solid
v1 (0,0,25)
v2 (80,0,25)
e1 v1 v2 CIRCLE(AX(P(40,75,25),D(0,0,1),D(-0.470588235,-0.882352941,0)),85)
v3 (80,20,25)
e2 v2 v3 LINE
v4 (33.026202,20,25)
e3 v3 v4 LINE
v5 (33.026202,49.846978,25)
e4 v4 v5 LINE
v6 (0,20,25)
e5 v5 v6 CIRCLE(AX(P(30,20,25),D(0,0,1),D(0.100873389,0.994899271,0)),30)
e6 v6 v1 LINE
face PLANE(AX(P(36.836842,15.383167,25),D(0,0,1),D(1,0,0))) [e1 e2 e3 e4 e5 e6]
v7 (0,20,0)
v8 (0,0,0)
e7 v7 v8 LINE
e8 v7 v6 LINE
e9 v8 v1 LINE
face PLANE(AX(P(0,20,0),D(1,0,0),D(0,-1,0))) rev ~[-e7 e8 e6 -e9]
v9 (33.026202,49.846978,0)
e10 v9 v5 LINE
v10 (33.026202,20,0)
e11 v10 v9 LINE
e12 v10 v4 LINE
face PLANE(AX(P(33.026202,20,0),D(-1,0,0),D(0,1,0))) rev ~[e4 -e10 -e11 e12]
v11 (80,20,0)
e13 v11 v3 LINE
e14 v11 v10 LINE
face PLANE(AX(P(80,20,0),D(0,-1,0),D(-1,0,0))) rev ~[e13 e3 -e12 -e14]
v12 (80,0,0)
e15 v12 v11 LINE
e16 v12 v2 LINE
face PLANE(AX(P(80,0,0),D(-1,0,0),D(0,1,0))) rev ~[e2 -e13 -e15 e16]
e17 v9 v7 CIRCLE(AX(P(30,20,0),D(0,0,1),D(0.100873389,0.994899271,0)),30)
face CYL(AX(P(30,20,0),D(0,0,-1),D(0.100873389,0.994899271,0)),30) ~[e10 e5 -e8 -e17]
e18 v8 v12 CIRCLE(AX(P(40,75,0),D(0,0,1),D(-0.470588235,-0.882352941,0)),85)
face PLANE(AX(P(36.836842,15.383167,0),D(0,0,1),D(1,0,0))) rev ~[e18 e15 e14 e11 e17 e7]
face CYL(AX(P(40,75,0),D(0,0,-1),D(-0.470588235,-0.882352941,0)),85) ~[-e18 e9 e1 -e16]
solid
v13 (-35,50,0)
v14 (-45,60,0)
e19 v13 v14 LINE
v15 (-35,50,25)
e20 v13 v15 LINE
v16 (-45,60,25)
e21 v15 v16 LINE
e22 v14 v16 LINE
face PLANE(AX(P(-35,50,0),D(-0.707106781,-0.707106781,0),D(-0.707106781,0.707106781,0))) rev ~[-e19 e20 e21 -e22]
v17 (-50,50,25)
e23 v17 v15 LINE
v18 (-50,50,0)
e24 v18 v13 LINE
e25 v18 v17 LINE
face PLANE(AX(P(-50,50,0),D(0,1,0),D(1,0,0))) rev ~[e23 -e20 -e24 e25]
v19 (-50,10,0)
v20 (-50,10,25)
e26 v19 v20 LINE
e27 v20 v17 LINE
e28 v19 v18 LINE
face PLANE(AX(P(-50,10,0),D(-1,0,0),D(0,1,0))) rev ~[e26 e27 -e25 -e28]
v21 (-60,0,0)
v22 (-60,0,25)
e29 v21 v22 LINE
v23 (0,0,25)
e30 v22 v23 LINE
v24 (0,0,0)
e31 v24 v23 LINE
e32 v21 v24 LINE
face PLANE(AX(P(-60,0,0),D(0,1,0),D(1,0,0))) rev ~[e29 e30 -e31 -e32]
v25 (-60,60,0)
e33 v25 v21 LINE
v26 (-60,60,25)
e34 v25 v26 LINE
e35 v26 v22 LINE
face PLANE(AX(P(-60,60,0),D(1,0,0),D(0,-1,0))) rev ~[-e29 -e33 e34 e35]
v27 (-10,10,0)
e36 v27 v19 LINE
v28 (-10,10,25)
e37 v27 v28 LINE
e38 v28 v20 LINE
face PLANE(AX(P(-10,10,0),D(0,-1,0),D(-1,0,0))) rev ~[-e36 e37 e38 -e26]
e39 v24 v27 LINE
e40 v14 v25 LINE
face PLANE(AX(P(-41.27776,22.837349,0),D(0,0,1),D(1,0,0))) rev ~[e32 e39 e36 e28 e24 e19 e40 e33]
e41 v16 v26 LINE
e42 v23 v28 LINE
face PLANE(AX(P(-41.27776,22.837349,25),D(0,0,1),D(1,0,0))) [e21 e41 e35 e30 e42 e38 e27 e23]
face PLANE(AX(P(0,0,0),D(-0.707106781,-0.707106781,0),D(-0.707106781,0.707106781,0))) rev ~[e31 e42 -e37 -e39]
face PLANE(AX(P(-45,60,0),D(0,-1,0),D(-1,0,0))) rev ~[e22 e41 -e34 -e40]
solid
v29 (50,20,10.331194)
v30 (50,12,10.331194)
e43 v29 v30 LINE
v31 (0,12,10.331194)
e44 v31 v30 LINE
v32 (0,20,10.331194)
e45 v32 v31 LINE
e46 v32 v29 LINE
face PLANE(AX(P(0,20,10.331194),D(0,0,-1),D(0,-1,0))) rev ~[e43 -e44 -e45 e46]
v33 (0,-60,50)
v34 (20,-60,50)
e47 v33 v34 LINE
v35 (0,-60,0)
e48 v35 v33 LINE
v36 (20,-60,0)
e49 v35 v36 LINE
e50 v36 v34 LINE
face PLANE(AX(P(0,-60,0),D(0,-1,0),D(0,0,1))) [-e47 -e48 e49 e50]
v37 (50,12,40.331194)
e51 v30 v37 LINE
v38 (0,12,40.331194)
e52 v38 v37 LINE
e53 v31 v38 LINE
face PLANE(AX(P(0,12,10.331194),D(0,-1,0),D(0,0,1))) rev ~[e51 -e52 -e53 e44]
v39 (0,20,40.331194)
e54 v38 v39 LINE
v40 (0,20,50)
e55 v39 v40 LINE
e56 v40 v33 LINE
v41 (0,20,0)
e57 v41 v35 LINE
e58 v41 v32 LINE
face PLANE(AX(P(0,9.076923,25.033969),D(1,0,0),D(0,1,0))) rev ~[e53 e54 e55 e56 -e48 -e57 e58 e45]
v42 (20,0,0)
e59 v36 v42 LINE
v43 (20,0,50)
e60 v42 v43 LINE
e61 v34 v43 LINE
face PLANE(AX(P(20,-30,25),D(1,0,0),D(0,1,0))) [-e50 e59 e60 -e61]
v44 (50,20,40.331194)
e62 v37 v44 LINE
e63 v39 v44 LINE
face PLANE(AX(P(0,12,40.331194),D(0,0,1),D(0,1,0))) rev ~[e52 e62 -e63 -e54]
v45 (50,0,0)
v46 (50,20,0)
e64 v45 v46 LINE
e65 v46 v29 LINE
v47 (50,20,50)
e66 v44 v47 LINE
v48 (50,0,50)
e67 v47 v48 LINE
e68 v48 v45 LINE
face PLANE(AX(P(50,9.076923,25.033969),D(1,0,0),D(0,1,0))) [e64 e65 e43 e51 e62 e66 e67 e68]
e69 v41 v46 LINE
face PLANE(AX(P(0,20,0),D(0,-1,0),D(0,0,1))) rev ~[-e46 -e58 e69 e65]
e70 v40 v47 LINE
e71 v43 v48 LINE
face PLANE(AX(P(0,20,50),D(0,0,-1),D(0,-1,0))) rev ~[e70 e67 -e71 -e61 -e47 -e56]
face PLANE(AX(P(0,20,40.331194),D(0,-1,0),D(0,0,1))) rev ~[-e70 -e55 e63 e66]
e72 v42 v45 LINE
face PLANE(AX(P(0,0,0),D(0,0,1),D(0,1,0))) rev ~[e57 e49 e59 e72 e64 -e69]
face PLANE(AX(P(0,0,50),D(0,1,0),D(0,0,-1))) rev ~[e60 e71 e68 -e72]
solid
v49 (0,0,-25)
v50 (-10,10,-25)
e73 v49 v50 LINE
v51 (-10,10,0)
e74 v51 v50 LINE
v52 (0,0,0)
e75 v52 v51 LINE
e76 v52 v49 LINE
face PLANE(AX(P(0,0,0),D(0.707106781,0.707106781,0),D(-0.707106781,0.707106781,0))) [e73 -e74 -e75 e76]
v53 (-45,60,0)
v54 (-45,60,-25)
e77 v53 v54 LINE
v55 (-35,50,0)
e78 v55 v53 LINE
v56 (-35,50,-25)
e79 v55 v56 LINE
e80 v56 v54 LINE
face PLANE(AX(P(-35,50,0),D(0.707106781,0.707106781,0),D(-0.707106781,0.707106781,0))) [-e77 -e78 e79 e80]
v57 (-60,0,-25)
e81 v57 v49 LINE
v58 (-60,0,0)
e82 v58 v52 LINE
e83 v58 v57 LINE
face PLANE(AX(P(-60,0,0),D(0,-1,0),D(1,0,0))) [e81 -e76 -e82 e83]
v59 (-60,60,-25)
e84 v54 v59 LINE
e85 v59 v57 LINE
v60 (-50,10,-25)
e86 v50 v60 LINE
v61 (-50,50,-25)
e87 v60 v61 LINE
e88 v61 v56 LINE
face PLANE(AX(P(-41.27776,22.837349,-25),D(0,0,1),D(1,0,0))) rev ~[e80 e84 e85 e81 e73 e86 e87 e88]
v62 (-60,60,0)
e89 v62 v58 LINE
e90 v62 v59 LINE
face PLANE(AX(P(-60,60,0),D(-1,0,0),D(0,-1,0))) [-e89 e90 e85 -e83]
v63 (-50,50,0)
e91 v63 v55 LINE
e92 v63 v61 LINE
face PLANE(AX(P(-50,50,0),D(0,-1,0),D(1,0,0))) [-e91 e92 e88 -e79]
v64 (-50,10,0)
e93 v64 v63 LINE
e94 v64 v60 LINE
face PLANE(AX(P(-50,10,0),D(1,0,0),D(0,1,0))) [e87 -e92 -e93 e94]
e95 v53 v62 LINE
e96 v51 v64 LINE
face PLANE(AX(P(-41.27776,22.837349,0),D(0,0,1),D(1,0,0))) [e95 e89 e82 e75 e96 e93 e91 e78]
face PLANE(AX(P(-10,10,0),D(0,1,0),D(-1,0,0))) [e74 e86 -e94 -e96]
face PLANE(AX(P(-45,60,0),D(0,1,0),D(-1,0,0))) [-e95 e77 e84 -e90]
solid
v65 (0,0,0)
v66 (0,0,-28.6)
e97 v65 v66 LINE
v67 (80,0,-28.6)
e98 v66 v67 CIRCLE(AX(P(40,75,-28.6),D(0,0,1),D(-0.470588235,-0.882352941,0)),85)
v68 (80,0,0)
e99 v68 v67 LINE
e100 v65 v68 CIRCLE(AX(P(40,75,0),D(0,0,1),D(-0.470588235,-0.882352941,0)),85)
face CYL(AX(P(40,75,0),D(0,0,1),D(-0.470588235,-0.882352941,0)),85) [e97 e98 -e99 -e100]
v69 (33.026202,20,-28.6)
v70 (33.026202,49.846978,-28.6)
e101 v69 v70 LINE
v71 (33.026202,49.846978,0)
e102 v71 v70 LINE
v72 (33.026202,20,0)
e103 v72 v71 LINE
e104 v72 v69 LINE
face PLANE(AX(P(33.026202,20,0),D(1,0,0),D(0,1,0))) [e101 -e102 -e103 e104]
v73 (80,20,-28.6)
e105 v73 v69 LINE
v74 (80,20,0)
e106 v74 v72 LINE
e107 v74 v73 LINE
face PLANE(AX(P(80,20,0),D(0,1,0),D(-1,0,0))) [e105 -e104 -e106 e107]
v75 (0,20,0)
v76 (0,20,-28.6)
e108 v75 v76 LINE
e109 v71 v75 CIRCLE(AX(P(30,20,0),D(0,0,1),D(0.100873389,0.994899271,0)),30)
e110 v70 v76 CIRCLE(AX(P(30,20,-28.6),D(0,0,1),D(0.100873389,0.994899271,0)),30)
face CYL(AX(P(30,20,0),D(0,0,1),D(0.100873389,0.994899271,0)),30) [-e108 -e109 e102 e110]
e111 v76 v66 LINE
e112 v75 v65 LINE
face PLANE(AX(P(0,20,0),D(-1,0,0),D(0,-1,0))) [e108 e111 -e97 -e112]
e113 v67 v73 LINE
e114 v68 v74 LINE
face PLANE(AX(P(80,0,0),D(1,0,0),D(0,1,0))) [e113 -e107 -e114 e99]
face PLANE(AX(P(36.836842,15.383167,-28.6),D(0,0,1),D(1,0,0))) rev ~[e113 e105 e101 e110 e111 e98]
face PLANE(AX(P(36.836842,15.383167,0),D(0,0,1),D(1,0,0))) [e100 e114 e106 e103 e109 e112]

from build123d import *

# Parameters (mm, degrees)
F2_DEPTH = 28.6
F3_DEPTH = 25
F4_DEPTH = 25
F5_W     = 60
F5_H     = 50
F6_DEPTH = 20
F7_DEPTH = 50


with BuildPart() as f2:
    # F1 (on Top) → F2 (new body)
    with BuildSketch(Plane.XY):
        with BuildLine():
            Line((33.0262016572, 20), (33.0262016572, 49.8469781306))
            ThreePointArc((33.0262016572, 49.8469781306), (9.8851553538, 42.2574262856), (0, 20))
            Line((0, 20), (0, 0))
            ThreePointArc((0, 0), (40, -10), (80, 0))
            Line((80, 0), (80, 20))
            Line((80, 20), (33.0262016572, 20))
        make_face()
    extrude(amount=-F2_DEPTH)


with BuildPart() as f3:
    # F0 (on Top) → F3 (new body)
    with BuildSketch(Plane.XY):
        Polygon((-35, 50), (-45, 60), (-60, 60), (-60, 0), (0, 0), (-10, 10), (-50, 10), (-50, 50), align=None)
    extrude(amount=-F3_DEPTH)


with BuildPart() as f4:
    # F4 (new): a face of the model
    f4_faces = [f3.part.faces().sort_by_distance(p)[0] for p in [
        (-40.6, 54.4, 0),
    ]]
    extrude(f4_faces, amount=F4_DEPTH)


with BuildPart() as f4b:
    # F4#2 (new): a face of the model
    f4_2_faces = [f2.part.faces().sort_by_distance(p)[0] for p in [
        (34.2678216029, 13.6636139623, 0),
    ]]
    extrude(f4_2_faces, amount=F4_DEPTH)


with BuildPart() as f6:
    # F5 (on Right) → F6 (new body)
    with BuildSketch(Plane.YZ):
        with Locations((-30, 25)):
            Rectangle(F5_W, F5_H)
    extrude(amount=F6_DEPTH)

    # F5 (on Right) → F7 (join)
    with BuildSketch(Plane.YZ):
        Polygon((20, 50), (0, 50), (0, 0), (20, 0), (20, 10.3311939165), (12, 10.3311939165), (12, 40.3311939165), (20, 40.3311939165), align=None)
    extrude(amount=F7_DEPTH)


solid = Compound([f2.part, f3.part, f4.part, f4b.part, f6.part])
